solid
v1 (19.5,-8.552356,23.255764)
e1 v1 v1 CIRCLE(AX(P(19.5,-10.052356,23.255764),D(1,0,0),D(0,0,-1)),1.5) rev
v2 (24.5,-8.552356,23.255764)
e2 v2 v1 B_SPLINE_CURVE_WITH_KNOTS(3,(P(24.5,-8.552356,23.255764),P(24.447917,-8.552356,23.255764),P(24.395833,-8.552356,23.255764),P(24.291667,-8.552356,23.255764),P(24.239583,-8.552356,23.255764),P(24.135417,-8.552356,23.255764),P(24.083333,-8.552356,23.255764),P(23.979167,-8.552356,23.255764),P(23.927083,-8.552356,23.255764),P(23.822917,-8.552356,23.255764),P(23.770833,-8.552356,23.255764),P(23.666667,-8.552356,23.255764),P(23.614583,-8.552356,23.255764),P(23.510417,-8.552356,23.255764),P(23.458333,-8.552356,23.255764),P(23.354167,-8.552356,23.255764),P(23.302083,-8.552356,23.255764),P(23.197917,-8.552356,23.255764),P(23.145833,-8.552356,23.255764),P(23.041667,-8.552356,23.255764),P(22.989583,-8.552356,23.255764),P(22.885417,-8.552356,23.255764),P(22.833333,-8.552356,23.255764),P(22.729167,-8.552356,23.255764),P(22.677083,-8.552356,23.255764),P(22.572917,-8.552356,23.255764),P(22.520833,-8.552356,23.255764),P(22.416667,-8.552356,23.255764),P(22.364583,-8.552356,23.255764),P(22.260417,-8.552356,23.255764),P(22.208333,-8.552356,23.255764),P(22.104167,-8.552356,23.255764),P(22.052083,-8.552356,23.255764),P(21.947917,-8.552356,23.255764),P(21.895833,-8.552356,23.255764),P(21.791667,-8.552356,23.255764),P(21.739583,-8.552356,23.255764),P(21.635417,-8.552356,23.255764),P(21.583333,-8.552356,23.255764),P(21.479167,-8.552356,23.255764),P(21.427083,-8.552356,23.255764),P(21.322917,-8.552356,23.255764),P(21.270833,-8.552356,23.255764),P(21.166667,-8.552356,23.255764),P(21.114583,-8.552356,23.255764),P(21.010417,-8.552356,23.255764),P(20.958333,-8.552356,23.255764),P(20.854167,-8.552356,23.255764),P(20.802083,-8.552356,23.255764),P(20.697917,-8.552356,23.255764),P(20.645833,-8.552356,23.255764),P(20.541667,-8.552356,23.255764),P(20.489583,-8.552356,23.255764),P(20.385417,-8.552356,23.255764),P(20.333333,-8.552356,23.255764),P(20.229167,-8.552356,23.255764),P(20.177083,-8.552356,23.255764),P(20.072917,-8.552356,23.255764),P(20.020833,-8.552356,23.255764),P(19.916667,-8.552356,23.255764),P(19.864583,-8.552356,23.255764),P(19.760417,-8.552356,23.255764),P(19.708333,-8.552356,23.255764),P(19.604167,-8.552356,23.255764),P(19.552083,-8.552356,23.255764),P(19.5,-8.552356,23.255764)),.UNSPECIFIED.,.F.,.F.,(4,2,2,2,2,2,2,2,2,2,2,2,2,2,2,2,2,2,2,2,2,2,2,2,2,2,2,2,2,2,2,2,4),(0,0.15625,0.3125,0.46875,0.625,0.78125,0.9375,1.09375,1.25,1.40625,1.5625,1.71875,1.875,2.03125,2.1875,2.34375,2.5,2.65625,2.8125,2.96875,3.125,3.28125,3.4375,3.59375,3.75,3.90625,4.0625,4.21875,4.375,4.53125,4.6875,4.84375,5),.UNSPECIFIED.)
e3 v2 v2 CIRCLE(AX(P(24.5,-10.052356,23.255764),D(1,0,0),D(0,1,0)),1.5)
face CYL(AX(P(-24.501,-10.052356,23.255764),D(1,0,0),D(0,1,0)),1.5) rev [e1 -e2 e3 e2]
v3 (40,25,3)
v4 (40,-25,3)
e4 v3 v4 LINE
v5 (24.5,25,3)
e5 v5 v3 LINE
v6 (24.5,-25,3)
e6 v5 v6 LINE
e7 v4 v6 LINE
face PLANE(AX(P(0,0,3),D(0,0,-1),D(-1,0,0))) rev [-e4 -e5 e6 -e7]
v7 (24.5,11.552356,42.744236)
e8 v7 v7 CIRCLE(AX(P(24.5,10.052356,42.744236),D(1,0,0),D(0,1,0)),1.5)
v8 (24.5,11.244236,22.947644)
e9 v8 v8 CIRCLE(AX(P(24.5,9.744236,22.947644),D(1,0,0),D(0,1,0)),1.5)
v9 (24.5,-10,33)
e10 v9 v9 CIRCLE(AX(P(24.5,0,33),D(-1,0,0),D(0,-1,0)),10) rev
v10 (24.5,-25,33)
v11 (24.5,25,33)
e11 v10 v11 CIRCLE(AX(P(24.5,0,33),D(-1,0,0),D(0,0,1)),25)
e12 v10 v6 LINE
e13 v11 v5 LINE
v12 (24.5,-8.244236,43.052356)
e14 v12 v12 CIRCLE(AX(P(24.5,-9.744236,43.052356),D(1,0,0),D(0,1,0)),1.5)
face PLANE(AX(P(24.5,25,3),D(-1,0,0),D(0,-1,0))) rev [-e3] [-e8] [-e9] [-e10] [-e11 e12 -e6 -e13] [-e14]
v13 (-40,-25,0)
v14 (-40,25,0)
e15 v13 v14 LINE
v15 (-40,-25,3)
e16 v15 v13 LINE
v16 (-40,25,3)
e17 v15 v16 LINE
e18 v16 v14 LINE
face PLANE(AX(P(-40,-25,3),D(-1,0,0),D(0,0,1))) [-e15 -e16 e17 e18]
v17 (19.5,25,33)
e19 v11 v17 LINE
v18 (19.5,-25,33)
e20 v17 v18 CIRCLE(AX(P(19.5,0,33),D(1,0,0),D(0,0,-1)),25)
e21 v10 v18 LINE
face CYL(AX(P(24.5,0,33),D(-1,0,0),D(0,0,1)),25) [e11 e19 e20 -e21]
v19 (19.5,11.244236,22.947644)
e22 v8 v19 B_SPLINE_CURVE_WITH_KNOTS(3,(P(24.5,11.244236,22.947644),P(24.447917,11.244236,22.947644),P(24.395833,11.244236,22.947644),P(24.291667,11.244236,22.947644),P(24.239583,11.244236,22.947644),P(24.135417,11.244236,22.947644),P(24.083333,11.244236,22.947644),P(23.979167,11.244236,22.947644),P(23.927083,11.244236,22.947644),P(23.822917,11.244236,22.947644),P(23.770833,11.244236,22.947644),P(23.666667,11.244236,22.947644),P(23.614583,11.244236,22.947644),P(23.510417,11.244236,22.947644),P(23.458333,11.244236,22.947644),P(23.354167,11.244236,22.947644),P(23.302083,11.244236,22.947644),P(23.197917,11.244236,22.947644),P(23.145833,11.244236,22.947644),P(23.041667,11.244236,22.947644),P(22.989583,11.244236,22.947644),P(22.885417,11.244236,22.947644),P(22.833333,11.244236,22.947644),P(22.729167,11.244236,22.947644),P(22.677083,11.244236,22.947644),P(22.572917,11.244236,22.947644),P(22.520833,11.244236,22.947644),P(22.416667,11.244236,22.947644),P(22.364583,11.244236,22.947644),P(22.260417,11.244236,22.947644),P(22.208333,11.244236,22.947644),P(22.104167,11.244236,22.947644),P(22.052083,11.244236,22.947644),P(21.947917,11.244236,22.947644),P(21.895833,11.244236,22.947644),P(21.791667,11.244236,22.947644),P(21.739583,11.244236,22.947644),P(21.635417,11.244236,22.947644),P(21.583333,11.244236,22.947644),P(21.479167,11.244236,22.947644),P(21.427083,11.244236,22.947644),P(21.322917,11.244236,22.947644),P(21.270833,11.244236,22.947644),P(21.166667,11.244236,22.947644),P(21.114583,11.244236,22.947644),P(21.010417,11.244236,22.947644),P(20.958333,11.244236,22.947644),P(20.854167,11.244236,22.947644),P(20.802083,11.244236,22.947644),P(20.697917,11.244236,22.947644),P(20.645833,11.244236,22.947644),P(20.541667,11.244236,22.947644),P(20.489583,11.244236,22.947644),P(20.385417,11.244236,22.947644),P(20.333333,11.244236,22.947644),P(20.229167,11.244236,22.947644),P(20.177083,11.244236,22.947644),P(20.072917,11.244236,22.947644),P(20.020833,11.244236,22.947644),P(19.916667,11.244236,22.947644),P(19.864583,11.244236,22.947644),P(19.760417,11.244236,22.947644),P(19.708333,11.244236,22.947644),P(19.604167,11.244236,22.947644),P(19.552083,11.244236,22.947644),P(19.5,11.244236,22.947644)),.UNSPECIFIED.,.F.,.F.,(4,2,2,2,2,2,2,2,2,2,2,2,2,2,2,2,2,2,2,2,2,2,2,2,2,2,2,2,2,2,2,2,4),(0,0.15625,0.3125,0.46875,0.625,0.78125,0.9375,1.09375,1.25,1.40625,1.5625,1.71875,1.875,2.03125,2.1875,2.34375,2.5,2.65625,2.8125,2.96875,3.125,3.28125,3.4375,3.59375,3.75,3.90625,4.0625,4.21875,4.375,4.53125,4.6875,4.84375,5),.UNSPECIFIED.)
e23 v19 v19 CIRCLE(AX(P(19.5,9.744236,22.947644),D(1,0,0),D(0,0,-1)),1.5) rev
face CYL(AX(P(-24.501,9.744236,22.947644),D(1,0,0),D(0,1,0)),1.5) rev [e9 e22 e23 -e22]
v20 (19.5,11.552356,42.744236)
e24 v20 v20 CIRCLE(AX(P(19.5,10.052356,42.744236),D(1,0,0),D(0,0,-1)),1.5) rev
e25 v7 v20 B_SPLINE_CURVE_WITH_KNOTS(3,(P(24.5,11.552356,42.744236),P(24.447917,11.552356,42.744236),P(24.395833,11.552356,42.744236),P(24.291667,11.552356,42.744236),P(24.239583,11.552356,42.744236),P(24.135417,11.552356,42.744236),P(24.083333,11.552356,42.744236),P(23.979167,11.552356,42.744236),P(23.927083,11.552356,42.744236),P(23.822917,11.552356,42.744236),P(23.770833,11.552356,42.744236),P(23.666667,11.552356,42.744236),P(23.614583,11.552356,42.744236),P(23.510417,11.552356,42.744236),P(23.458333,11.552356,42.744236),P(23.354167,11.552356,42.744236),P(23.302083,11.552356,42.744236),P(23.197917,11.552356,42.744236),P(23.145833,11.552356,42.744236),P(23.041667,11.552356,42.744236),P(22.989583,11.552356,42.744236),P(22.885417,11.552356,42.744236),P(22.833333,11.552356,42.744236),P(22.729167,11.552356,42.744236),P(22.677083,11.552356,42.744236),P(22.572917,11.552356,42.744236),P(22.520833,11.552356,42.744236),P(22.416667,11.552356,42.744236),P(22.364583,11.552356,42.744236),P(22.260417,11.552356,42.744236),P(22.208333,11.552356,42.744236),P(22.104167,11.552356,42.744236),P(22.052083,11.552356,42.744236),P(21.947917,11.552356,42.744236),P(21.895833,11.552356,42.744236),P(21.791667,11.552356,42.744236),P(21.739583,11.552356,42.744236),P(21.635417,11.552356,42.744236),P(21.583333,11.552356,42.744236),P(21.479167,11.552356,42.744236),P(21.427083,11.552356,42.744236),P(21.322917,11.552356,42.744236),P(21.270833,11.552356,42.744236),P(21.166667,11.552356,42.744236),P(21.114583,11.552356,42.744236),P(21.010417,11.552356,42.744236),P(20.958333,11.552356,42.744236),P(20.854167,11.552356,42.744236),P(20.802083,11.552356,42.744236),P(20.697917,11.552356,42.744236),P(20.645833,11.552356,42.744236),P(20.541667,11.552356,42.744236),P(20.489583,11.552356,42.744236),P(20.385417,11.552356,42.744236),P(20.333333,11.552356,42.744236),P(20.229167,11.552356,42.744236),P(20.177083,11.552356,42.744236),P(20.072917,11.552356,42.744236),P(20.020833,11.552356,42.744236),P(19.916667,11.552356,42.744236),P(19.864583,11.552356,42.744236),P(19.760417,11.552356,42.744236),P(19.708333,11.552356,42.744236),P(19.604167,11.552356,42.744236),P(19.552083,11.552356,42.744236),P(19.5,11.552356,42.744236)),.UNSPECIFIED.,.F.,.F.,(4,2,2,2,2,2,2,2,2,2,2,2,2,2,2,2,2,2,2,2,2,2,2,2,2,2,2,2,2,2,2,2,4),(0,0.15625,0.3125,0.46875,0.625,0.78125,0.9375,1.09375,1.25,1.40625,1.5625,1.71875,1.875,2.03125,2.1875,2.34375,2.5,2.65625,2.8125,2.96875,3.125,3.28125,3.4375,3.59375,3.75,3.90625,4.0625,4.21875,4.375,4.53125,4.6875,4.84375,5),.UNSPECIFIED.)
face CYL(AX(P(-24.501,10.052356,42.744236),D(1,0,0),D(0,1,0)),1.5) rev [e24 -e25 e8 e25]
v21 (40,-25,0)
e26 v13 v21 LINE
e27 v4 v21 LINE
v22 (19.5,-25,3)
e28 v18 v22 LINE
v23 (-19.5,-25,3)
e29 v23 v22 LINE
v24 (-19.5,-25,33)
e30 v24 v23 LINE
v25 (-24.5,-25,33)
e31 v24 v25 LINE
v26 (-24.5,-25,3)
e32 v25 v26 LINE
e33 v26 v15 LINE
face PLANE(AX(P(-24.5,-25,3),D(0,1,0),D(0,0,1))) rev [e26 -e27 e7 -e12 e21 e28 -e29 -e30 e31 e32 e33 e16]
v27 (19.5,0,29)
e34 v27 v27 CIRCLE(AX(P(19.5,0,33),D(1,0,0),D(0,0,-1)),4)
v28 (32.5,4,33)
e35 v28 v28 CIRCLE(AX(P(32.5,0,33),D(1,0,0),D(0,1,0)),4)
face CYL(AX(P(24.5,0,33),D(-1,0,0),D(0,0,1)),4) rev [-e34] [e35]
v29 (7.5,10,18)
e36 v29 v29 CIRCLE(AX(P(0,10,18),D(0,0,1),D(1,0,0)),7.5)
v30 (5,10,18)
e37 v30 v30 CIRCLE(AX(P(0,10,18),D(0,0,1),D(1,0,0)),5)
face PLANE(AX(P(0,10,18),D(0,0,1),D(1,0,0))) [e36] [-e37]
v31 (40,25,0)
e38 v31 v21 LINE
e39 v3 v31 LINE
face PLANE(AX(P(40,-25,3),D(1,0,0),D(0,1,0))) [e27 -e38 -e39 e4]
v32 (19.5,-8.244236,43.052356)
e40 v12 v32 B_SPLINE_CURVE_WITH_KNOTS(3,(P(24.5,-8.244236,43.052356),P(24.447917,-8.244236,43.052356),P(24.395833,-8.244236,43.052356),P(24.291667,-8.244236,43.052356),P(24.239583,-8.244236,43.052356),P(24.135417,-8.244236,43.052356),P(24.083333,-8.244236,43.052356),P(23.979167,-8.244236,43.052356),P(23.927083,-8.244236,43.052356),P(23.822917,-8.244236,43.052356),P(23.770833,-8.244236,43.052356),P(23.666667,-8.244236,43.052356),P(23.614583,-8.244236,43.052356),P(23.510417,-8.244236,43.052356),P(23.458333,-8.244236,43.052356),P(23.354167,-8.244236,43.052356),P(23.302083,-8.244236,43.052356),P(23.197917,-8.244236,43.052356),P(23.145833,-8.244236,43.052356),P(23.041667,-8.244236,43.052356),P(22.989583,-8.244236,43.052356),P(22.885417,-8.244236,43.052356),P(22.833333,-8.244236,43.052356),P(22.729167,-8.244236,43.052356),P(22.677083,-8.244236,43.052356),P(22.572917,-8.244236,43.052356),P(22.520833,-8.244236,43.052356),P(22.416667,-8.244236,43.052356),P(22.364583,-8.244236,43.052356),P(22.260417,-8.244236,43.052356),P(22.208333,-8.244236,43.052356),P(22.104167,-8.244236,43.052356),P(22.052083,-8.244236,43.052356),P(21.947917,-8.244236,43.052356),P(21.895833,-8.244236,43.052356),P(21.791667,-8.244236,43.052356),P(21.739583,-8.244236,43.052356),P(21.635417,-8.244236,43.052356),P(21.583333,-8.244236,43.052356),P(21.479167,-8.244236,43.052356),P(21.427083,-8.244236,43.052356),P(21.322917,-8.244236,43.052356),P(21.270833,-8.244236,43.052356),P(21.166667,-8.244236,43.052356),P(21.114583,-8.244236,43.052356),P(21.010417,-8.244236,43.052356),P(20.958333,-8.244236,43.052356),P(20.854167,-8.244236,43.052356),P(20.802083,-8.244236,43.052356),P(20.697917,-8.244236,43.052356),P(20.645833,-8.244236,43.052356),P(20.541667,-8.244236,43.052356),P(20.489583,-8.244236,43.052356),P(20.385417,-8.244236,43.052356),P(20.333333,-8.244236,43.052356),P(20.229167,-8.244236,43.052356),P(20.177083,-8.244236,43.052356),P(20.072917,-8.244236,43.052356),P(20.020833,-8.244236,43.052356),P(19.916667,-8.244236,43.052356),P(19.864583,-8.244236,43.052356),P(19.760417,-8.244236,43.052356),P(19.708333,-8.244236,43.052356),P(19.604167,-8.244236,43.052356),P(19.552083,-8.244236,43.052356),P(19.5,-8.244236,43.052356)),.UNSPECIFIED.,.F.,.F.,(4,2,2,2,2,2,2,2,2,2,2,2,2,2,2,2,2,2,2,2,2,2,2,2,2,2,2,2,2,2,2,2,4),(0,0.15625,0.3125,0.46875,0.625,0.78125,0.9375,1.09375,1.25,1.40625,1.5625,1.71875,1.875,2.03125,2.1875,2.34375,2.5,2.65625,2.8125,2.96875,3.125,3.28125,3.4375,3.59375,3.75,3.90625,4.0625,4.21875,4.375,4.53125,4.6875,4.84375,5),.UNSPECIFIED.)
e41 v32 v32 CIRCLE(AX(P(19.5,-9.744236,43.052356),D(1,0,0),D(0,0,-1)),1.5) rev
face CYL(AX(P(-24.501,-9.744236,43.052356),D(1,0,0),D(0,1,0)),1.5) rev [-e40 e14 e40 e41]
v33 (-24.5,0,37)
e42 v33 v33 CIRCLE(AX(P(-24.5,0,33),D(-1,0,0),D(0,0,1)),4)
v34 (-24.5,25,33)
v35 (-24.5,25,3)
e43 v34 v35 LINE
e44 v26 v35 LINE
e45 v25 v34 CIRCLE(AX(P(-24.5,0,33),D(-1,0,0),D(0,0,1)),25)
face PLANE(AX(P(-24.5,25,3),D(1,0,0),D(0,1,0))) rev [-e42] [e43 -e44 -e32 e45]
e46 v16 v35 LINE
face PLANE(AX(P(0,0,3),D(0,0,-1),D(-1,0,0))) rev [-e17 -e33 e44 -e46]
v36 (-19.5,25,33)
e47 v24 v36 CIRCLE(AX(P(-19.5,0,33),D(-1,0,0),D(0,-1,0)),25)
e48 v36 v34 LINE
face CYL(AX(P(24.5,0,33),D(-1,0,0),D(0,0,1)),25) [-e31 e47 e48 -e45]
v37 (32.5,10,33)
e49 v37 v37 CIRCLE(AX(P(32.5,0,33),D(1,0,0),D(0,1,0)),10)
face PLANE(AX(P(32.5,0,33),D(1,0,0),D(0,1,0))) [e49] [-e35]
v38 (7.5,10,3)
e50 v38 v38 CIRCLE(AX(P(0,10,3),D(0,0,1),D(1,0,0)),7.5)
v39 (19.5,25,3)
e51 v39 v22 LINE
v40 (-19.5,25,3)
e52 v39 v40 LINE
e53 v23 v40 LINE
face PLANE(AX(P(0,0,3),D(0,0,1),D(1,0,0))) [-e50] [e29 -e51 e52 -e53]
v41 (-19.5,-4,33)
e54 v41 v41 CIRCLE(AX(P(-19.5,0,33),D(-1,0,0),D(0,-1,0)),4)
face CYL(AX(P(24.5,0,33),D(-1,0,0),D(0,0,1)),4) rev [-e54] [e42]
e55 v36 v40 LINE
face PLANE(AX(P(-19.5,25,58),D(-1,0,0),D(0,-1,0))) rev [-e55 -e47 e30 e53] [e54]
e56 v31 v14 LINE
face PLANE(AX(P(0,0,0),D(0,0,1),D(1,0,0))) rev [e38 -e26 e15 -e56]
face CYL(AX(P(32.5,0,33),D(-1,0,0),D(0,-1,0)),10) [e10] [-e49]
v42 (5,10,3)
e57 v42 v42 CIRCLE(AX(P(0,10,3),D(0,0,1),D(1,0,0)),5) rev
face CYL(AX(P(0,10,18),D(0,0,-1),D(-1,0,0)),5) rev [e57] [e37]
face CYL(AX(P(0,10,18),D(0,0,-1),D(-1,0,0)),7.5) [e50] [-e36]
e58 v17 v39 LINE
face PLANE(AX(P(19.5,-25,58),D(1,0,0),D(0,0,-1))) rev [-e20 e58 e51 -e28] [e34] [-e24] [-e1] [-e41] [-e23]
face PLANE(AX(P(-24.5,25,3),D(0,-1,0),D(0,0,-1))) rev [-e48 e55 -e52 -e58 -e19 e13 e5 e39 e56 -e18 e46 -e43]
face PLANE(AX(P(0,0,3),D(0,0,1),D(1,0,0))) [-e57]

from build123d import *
from build123d.topology import SkipClean

# Parameters (mm, degrees)
SKETCH1_W              = 49
SKETCH1_H              = 50
BOSS_EXTRUDE1_DEPTH    = 3
SKETCH2_W              = 5
SKETCH2_H              = 50
BOSS_EXTRUDE2_DEPTH    = 55
SKETCH3_OUTSIDE_W      = 78.182
SKETCH3_OUTSIDE_H      = 70.182
SKETCH3_OUTSIDE_R      = 4
CUT_EXTRUDE1_DEPTH     = 80.937475567
SKETCH4_R              = 7.5
SKETCH4_R_2            = 5
BOSS_EXTRUDE3_DEPTH    = 15
SKETCH5_R              = 10
SKETCH5_R_2            = 4
BOSS_EXTRUDE4_DEPTH    = 8
CUT_EXTRUDE2_START     = -5
CUT_EXTRUDE2_OUTLINE_R = 1.5
CUT_EXTRUDE2_DEPTH     = 5
SKETCH7_W              = 80
SKETCH7_H              = 50
BOSS_EXTRUDE5_DEPTH    = 3


# Read off the part's stored shape, not the designer's step: Cut-Extrude2
with BuildPart() as part:
    # Sketch1 → Boss-Extrude1 (new body)
    with BuildSketch(Plane.XY):
        Rectangle(SKETCH1_W, SKETCH1_H)
    extrude(amount=BOSS_EXTRUDE1_DEPTH)

    # Sketch2 → Boss-Extrude2 (add)
    with BuildSketch(Plane.XY.offset(3)):
        with Locations((-22, 0)):
            Rectangle(SKETCH2_W, SKETCH2_H)
        with Locations((22, 0)):
            Rectangle(SKETCH2_W, SKETCH2_H)
    extrude(amount=BOSS_EXTRUDE2_DEPTH)

    # Sketch3 outside → Cut-Extrude1 (cut, through all)
    # profile 1 of 2: a face of its own
    with BuildSketch(Plane.ZY.offset(24.5)):
        with Locations((29, 0)):
            Rectangle(SKETCH3_OUTSIDE_W, SKETCH3_OUTSIDE_H)
        with BuildLine():
            Line((0, 25), (0, -25))
            Line((0, -25), (33, -25))
            ThreePointArc((33, -25), (58, 0), (33, 25))
            Line((33, 25), (0, 25))
        make_face(mode=Mode.SUBTRACT)
    # profile 2 of 2: a face of its own
    with BuildSketch(Plane.ZY.offset(24.5)):
        with Locations((33, 0)):
            Circle(SKETCH3_OUTSIDE_R)
    extrude(amount=-CUT_EXTRUDE1_DEPTH, mode=Mode.SUBTRACT)

    # Sketch4 → Boss-Extrude3 (add)
    with BuildSketch(Plane.XY.offset(3)):
        with Locations((0, 10)):
            Circle(SKETCH4_R)
        with Locations((0, 10)):
            Circle(SKETCH4_R_2, mode=Mode.SUBTRACT)
    extrude(amount=BOSS_EXTRUDE3_DEPTH)

    # Sketch5 → Boss-Extrude4 (add)
    with SkipClean():  # the faces are left unmerged after this step: merging them gives an invalid solid
        with BuildSketch(Plane(origin=(24.5, 0, 0), x_dir=(0, 0, -1), z_dir=(1, 0, 0))):
            with Locations(Location((-33, 0, 0), (0, 0, 270))):
                Circle(SKETCH5_R)
            with Locations(Location((-33, 0, 0), (0, 0, 90))):
                Circle(SKETCH5_R_2, mode=Mode.SUBTRACT)
        extrude(amount=BOSS_EXTRUDE4_DEPTH)

    # Cut-Extrude2 outline → Cut-Extrude2 (cut)
    with SkipClean():  # the faces are left unmerged after this step: merging them gives an invalid solid
        with BuildSketch(Plane(origin=(24.5, 0, 0), x_dir=(0, 0, -1), z_dir=(1, 0, 0)).offset(CUT_EXTRUDE2_START)):
            with Locations((-42.744235689, 10.052356482)):
                Circle(CUT_EXTRUDE2_OUTLINE_R)
            with Locations((-22.947643518, 9.744235689)):
                Circle(CUT_EXTRUDE2_OUTLINE_R)
            with Locations((-23.255764311, -10.052356482)):
                Circle(CUT_EXTRUDE2_OUTLINE_R)
            with Locations((-43.052356482, -9.744235689)):
                Circle(CUT_EXTRUDE2_OUTLINE_R)
        extrude(amount=CUT_EXTRUDE2_DEPTH, mode=Mode.SUBTRACT)

    # Sketch7 → Boss-Extrude5 (add)
    with SkipClean():  # the faces are left unmerged after this step: merging them gives an invalid solid
        with BuildSketch(Plane(origin=(0, 0, 0), x_dir=(-1, 0, 0), z_dir=(0, 0, -1))):
            Rectangle(SKETCH7_W, SKETCH7_H)
        extrude(amount=-BOSS_EXTRUDE5_DEPTH)


solid = part.part
